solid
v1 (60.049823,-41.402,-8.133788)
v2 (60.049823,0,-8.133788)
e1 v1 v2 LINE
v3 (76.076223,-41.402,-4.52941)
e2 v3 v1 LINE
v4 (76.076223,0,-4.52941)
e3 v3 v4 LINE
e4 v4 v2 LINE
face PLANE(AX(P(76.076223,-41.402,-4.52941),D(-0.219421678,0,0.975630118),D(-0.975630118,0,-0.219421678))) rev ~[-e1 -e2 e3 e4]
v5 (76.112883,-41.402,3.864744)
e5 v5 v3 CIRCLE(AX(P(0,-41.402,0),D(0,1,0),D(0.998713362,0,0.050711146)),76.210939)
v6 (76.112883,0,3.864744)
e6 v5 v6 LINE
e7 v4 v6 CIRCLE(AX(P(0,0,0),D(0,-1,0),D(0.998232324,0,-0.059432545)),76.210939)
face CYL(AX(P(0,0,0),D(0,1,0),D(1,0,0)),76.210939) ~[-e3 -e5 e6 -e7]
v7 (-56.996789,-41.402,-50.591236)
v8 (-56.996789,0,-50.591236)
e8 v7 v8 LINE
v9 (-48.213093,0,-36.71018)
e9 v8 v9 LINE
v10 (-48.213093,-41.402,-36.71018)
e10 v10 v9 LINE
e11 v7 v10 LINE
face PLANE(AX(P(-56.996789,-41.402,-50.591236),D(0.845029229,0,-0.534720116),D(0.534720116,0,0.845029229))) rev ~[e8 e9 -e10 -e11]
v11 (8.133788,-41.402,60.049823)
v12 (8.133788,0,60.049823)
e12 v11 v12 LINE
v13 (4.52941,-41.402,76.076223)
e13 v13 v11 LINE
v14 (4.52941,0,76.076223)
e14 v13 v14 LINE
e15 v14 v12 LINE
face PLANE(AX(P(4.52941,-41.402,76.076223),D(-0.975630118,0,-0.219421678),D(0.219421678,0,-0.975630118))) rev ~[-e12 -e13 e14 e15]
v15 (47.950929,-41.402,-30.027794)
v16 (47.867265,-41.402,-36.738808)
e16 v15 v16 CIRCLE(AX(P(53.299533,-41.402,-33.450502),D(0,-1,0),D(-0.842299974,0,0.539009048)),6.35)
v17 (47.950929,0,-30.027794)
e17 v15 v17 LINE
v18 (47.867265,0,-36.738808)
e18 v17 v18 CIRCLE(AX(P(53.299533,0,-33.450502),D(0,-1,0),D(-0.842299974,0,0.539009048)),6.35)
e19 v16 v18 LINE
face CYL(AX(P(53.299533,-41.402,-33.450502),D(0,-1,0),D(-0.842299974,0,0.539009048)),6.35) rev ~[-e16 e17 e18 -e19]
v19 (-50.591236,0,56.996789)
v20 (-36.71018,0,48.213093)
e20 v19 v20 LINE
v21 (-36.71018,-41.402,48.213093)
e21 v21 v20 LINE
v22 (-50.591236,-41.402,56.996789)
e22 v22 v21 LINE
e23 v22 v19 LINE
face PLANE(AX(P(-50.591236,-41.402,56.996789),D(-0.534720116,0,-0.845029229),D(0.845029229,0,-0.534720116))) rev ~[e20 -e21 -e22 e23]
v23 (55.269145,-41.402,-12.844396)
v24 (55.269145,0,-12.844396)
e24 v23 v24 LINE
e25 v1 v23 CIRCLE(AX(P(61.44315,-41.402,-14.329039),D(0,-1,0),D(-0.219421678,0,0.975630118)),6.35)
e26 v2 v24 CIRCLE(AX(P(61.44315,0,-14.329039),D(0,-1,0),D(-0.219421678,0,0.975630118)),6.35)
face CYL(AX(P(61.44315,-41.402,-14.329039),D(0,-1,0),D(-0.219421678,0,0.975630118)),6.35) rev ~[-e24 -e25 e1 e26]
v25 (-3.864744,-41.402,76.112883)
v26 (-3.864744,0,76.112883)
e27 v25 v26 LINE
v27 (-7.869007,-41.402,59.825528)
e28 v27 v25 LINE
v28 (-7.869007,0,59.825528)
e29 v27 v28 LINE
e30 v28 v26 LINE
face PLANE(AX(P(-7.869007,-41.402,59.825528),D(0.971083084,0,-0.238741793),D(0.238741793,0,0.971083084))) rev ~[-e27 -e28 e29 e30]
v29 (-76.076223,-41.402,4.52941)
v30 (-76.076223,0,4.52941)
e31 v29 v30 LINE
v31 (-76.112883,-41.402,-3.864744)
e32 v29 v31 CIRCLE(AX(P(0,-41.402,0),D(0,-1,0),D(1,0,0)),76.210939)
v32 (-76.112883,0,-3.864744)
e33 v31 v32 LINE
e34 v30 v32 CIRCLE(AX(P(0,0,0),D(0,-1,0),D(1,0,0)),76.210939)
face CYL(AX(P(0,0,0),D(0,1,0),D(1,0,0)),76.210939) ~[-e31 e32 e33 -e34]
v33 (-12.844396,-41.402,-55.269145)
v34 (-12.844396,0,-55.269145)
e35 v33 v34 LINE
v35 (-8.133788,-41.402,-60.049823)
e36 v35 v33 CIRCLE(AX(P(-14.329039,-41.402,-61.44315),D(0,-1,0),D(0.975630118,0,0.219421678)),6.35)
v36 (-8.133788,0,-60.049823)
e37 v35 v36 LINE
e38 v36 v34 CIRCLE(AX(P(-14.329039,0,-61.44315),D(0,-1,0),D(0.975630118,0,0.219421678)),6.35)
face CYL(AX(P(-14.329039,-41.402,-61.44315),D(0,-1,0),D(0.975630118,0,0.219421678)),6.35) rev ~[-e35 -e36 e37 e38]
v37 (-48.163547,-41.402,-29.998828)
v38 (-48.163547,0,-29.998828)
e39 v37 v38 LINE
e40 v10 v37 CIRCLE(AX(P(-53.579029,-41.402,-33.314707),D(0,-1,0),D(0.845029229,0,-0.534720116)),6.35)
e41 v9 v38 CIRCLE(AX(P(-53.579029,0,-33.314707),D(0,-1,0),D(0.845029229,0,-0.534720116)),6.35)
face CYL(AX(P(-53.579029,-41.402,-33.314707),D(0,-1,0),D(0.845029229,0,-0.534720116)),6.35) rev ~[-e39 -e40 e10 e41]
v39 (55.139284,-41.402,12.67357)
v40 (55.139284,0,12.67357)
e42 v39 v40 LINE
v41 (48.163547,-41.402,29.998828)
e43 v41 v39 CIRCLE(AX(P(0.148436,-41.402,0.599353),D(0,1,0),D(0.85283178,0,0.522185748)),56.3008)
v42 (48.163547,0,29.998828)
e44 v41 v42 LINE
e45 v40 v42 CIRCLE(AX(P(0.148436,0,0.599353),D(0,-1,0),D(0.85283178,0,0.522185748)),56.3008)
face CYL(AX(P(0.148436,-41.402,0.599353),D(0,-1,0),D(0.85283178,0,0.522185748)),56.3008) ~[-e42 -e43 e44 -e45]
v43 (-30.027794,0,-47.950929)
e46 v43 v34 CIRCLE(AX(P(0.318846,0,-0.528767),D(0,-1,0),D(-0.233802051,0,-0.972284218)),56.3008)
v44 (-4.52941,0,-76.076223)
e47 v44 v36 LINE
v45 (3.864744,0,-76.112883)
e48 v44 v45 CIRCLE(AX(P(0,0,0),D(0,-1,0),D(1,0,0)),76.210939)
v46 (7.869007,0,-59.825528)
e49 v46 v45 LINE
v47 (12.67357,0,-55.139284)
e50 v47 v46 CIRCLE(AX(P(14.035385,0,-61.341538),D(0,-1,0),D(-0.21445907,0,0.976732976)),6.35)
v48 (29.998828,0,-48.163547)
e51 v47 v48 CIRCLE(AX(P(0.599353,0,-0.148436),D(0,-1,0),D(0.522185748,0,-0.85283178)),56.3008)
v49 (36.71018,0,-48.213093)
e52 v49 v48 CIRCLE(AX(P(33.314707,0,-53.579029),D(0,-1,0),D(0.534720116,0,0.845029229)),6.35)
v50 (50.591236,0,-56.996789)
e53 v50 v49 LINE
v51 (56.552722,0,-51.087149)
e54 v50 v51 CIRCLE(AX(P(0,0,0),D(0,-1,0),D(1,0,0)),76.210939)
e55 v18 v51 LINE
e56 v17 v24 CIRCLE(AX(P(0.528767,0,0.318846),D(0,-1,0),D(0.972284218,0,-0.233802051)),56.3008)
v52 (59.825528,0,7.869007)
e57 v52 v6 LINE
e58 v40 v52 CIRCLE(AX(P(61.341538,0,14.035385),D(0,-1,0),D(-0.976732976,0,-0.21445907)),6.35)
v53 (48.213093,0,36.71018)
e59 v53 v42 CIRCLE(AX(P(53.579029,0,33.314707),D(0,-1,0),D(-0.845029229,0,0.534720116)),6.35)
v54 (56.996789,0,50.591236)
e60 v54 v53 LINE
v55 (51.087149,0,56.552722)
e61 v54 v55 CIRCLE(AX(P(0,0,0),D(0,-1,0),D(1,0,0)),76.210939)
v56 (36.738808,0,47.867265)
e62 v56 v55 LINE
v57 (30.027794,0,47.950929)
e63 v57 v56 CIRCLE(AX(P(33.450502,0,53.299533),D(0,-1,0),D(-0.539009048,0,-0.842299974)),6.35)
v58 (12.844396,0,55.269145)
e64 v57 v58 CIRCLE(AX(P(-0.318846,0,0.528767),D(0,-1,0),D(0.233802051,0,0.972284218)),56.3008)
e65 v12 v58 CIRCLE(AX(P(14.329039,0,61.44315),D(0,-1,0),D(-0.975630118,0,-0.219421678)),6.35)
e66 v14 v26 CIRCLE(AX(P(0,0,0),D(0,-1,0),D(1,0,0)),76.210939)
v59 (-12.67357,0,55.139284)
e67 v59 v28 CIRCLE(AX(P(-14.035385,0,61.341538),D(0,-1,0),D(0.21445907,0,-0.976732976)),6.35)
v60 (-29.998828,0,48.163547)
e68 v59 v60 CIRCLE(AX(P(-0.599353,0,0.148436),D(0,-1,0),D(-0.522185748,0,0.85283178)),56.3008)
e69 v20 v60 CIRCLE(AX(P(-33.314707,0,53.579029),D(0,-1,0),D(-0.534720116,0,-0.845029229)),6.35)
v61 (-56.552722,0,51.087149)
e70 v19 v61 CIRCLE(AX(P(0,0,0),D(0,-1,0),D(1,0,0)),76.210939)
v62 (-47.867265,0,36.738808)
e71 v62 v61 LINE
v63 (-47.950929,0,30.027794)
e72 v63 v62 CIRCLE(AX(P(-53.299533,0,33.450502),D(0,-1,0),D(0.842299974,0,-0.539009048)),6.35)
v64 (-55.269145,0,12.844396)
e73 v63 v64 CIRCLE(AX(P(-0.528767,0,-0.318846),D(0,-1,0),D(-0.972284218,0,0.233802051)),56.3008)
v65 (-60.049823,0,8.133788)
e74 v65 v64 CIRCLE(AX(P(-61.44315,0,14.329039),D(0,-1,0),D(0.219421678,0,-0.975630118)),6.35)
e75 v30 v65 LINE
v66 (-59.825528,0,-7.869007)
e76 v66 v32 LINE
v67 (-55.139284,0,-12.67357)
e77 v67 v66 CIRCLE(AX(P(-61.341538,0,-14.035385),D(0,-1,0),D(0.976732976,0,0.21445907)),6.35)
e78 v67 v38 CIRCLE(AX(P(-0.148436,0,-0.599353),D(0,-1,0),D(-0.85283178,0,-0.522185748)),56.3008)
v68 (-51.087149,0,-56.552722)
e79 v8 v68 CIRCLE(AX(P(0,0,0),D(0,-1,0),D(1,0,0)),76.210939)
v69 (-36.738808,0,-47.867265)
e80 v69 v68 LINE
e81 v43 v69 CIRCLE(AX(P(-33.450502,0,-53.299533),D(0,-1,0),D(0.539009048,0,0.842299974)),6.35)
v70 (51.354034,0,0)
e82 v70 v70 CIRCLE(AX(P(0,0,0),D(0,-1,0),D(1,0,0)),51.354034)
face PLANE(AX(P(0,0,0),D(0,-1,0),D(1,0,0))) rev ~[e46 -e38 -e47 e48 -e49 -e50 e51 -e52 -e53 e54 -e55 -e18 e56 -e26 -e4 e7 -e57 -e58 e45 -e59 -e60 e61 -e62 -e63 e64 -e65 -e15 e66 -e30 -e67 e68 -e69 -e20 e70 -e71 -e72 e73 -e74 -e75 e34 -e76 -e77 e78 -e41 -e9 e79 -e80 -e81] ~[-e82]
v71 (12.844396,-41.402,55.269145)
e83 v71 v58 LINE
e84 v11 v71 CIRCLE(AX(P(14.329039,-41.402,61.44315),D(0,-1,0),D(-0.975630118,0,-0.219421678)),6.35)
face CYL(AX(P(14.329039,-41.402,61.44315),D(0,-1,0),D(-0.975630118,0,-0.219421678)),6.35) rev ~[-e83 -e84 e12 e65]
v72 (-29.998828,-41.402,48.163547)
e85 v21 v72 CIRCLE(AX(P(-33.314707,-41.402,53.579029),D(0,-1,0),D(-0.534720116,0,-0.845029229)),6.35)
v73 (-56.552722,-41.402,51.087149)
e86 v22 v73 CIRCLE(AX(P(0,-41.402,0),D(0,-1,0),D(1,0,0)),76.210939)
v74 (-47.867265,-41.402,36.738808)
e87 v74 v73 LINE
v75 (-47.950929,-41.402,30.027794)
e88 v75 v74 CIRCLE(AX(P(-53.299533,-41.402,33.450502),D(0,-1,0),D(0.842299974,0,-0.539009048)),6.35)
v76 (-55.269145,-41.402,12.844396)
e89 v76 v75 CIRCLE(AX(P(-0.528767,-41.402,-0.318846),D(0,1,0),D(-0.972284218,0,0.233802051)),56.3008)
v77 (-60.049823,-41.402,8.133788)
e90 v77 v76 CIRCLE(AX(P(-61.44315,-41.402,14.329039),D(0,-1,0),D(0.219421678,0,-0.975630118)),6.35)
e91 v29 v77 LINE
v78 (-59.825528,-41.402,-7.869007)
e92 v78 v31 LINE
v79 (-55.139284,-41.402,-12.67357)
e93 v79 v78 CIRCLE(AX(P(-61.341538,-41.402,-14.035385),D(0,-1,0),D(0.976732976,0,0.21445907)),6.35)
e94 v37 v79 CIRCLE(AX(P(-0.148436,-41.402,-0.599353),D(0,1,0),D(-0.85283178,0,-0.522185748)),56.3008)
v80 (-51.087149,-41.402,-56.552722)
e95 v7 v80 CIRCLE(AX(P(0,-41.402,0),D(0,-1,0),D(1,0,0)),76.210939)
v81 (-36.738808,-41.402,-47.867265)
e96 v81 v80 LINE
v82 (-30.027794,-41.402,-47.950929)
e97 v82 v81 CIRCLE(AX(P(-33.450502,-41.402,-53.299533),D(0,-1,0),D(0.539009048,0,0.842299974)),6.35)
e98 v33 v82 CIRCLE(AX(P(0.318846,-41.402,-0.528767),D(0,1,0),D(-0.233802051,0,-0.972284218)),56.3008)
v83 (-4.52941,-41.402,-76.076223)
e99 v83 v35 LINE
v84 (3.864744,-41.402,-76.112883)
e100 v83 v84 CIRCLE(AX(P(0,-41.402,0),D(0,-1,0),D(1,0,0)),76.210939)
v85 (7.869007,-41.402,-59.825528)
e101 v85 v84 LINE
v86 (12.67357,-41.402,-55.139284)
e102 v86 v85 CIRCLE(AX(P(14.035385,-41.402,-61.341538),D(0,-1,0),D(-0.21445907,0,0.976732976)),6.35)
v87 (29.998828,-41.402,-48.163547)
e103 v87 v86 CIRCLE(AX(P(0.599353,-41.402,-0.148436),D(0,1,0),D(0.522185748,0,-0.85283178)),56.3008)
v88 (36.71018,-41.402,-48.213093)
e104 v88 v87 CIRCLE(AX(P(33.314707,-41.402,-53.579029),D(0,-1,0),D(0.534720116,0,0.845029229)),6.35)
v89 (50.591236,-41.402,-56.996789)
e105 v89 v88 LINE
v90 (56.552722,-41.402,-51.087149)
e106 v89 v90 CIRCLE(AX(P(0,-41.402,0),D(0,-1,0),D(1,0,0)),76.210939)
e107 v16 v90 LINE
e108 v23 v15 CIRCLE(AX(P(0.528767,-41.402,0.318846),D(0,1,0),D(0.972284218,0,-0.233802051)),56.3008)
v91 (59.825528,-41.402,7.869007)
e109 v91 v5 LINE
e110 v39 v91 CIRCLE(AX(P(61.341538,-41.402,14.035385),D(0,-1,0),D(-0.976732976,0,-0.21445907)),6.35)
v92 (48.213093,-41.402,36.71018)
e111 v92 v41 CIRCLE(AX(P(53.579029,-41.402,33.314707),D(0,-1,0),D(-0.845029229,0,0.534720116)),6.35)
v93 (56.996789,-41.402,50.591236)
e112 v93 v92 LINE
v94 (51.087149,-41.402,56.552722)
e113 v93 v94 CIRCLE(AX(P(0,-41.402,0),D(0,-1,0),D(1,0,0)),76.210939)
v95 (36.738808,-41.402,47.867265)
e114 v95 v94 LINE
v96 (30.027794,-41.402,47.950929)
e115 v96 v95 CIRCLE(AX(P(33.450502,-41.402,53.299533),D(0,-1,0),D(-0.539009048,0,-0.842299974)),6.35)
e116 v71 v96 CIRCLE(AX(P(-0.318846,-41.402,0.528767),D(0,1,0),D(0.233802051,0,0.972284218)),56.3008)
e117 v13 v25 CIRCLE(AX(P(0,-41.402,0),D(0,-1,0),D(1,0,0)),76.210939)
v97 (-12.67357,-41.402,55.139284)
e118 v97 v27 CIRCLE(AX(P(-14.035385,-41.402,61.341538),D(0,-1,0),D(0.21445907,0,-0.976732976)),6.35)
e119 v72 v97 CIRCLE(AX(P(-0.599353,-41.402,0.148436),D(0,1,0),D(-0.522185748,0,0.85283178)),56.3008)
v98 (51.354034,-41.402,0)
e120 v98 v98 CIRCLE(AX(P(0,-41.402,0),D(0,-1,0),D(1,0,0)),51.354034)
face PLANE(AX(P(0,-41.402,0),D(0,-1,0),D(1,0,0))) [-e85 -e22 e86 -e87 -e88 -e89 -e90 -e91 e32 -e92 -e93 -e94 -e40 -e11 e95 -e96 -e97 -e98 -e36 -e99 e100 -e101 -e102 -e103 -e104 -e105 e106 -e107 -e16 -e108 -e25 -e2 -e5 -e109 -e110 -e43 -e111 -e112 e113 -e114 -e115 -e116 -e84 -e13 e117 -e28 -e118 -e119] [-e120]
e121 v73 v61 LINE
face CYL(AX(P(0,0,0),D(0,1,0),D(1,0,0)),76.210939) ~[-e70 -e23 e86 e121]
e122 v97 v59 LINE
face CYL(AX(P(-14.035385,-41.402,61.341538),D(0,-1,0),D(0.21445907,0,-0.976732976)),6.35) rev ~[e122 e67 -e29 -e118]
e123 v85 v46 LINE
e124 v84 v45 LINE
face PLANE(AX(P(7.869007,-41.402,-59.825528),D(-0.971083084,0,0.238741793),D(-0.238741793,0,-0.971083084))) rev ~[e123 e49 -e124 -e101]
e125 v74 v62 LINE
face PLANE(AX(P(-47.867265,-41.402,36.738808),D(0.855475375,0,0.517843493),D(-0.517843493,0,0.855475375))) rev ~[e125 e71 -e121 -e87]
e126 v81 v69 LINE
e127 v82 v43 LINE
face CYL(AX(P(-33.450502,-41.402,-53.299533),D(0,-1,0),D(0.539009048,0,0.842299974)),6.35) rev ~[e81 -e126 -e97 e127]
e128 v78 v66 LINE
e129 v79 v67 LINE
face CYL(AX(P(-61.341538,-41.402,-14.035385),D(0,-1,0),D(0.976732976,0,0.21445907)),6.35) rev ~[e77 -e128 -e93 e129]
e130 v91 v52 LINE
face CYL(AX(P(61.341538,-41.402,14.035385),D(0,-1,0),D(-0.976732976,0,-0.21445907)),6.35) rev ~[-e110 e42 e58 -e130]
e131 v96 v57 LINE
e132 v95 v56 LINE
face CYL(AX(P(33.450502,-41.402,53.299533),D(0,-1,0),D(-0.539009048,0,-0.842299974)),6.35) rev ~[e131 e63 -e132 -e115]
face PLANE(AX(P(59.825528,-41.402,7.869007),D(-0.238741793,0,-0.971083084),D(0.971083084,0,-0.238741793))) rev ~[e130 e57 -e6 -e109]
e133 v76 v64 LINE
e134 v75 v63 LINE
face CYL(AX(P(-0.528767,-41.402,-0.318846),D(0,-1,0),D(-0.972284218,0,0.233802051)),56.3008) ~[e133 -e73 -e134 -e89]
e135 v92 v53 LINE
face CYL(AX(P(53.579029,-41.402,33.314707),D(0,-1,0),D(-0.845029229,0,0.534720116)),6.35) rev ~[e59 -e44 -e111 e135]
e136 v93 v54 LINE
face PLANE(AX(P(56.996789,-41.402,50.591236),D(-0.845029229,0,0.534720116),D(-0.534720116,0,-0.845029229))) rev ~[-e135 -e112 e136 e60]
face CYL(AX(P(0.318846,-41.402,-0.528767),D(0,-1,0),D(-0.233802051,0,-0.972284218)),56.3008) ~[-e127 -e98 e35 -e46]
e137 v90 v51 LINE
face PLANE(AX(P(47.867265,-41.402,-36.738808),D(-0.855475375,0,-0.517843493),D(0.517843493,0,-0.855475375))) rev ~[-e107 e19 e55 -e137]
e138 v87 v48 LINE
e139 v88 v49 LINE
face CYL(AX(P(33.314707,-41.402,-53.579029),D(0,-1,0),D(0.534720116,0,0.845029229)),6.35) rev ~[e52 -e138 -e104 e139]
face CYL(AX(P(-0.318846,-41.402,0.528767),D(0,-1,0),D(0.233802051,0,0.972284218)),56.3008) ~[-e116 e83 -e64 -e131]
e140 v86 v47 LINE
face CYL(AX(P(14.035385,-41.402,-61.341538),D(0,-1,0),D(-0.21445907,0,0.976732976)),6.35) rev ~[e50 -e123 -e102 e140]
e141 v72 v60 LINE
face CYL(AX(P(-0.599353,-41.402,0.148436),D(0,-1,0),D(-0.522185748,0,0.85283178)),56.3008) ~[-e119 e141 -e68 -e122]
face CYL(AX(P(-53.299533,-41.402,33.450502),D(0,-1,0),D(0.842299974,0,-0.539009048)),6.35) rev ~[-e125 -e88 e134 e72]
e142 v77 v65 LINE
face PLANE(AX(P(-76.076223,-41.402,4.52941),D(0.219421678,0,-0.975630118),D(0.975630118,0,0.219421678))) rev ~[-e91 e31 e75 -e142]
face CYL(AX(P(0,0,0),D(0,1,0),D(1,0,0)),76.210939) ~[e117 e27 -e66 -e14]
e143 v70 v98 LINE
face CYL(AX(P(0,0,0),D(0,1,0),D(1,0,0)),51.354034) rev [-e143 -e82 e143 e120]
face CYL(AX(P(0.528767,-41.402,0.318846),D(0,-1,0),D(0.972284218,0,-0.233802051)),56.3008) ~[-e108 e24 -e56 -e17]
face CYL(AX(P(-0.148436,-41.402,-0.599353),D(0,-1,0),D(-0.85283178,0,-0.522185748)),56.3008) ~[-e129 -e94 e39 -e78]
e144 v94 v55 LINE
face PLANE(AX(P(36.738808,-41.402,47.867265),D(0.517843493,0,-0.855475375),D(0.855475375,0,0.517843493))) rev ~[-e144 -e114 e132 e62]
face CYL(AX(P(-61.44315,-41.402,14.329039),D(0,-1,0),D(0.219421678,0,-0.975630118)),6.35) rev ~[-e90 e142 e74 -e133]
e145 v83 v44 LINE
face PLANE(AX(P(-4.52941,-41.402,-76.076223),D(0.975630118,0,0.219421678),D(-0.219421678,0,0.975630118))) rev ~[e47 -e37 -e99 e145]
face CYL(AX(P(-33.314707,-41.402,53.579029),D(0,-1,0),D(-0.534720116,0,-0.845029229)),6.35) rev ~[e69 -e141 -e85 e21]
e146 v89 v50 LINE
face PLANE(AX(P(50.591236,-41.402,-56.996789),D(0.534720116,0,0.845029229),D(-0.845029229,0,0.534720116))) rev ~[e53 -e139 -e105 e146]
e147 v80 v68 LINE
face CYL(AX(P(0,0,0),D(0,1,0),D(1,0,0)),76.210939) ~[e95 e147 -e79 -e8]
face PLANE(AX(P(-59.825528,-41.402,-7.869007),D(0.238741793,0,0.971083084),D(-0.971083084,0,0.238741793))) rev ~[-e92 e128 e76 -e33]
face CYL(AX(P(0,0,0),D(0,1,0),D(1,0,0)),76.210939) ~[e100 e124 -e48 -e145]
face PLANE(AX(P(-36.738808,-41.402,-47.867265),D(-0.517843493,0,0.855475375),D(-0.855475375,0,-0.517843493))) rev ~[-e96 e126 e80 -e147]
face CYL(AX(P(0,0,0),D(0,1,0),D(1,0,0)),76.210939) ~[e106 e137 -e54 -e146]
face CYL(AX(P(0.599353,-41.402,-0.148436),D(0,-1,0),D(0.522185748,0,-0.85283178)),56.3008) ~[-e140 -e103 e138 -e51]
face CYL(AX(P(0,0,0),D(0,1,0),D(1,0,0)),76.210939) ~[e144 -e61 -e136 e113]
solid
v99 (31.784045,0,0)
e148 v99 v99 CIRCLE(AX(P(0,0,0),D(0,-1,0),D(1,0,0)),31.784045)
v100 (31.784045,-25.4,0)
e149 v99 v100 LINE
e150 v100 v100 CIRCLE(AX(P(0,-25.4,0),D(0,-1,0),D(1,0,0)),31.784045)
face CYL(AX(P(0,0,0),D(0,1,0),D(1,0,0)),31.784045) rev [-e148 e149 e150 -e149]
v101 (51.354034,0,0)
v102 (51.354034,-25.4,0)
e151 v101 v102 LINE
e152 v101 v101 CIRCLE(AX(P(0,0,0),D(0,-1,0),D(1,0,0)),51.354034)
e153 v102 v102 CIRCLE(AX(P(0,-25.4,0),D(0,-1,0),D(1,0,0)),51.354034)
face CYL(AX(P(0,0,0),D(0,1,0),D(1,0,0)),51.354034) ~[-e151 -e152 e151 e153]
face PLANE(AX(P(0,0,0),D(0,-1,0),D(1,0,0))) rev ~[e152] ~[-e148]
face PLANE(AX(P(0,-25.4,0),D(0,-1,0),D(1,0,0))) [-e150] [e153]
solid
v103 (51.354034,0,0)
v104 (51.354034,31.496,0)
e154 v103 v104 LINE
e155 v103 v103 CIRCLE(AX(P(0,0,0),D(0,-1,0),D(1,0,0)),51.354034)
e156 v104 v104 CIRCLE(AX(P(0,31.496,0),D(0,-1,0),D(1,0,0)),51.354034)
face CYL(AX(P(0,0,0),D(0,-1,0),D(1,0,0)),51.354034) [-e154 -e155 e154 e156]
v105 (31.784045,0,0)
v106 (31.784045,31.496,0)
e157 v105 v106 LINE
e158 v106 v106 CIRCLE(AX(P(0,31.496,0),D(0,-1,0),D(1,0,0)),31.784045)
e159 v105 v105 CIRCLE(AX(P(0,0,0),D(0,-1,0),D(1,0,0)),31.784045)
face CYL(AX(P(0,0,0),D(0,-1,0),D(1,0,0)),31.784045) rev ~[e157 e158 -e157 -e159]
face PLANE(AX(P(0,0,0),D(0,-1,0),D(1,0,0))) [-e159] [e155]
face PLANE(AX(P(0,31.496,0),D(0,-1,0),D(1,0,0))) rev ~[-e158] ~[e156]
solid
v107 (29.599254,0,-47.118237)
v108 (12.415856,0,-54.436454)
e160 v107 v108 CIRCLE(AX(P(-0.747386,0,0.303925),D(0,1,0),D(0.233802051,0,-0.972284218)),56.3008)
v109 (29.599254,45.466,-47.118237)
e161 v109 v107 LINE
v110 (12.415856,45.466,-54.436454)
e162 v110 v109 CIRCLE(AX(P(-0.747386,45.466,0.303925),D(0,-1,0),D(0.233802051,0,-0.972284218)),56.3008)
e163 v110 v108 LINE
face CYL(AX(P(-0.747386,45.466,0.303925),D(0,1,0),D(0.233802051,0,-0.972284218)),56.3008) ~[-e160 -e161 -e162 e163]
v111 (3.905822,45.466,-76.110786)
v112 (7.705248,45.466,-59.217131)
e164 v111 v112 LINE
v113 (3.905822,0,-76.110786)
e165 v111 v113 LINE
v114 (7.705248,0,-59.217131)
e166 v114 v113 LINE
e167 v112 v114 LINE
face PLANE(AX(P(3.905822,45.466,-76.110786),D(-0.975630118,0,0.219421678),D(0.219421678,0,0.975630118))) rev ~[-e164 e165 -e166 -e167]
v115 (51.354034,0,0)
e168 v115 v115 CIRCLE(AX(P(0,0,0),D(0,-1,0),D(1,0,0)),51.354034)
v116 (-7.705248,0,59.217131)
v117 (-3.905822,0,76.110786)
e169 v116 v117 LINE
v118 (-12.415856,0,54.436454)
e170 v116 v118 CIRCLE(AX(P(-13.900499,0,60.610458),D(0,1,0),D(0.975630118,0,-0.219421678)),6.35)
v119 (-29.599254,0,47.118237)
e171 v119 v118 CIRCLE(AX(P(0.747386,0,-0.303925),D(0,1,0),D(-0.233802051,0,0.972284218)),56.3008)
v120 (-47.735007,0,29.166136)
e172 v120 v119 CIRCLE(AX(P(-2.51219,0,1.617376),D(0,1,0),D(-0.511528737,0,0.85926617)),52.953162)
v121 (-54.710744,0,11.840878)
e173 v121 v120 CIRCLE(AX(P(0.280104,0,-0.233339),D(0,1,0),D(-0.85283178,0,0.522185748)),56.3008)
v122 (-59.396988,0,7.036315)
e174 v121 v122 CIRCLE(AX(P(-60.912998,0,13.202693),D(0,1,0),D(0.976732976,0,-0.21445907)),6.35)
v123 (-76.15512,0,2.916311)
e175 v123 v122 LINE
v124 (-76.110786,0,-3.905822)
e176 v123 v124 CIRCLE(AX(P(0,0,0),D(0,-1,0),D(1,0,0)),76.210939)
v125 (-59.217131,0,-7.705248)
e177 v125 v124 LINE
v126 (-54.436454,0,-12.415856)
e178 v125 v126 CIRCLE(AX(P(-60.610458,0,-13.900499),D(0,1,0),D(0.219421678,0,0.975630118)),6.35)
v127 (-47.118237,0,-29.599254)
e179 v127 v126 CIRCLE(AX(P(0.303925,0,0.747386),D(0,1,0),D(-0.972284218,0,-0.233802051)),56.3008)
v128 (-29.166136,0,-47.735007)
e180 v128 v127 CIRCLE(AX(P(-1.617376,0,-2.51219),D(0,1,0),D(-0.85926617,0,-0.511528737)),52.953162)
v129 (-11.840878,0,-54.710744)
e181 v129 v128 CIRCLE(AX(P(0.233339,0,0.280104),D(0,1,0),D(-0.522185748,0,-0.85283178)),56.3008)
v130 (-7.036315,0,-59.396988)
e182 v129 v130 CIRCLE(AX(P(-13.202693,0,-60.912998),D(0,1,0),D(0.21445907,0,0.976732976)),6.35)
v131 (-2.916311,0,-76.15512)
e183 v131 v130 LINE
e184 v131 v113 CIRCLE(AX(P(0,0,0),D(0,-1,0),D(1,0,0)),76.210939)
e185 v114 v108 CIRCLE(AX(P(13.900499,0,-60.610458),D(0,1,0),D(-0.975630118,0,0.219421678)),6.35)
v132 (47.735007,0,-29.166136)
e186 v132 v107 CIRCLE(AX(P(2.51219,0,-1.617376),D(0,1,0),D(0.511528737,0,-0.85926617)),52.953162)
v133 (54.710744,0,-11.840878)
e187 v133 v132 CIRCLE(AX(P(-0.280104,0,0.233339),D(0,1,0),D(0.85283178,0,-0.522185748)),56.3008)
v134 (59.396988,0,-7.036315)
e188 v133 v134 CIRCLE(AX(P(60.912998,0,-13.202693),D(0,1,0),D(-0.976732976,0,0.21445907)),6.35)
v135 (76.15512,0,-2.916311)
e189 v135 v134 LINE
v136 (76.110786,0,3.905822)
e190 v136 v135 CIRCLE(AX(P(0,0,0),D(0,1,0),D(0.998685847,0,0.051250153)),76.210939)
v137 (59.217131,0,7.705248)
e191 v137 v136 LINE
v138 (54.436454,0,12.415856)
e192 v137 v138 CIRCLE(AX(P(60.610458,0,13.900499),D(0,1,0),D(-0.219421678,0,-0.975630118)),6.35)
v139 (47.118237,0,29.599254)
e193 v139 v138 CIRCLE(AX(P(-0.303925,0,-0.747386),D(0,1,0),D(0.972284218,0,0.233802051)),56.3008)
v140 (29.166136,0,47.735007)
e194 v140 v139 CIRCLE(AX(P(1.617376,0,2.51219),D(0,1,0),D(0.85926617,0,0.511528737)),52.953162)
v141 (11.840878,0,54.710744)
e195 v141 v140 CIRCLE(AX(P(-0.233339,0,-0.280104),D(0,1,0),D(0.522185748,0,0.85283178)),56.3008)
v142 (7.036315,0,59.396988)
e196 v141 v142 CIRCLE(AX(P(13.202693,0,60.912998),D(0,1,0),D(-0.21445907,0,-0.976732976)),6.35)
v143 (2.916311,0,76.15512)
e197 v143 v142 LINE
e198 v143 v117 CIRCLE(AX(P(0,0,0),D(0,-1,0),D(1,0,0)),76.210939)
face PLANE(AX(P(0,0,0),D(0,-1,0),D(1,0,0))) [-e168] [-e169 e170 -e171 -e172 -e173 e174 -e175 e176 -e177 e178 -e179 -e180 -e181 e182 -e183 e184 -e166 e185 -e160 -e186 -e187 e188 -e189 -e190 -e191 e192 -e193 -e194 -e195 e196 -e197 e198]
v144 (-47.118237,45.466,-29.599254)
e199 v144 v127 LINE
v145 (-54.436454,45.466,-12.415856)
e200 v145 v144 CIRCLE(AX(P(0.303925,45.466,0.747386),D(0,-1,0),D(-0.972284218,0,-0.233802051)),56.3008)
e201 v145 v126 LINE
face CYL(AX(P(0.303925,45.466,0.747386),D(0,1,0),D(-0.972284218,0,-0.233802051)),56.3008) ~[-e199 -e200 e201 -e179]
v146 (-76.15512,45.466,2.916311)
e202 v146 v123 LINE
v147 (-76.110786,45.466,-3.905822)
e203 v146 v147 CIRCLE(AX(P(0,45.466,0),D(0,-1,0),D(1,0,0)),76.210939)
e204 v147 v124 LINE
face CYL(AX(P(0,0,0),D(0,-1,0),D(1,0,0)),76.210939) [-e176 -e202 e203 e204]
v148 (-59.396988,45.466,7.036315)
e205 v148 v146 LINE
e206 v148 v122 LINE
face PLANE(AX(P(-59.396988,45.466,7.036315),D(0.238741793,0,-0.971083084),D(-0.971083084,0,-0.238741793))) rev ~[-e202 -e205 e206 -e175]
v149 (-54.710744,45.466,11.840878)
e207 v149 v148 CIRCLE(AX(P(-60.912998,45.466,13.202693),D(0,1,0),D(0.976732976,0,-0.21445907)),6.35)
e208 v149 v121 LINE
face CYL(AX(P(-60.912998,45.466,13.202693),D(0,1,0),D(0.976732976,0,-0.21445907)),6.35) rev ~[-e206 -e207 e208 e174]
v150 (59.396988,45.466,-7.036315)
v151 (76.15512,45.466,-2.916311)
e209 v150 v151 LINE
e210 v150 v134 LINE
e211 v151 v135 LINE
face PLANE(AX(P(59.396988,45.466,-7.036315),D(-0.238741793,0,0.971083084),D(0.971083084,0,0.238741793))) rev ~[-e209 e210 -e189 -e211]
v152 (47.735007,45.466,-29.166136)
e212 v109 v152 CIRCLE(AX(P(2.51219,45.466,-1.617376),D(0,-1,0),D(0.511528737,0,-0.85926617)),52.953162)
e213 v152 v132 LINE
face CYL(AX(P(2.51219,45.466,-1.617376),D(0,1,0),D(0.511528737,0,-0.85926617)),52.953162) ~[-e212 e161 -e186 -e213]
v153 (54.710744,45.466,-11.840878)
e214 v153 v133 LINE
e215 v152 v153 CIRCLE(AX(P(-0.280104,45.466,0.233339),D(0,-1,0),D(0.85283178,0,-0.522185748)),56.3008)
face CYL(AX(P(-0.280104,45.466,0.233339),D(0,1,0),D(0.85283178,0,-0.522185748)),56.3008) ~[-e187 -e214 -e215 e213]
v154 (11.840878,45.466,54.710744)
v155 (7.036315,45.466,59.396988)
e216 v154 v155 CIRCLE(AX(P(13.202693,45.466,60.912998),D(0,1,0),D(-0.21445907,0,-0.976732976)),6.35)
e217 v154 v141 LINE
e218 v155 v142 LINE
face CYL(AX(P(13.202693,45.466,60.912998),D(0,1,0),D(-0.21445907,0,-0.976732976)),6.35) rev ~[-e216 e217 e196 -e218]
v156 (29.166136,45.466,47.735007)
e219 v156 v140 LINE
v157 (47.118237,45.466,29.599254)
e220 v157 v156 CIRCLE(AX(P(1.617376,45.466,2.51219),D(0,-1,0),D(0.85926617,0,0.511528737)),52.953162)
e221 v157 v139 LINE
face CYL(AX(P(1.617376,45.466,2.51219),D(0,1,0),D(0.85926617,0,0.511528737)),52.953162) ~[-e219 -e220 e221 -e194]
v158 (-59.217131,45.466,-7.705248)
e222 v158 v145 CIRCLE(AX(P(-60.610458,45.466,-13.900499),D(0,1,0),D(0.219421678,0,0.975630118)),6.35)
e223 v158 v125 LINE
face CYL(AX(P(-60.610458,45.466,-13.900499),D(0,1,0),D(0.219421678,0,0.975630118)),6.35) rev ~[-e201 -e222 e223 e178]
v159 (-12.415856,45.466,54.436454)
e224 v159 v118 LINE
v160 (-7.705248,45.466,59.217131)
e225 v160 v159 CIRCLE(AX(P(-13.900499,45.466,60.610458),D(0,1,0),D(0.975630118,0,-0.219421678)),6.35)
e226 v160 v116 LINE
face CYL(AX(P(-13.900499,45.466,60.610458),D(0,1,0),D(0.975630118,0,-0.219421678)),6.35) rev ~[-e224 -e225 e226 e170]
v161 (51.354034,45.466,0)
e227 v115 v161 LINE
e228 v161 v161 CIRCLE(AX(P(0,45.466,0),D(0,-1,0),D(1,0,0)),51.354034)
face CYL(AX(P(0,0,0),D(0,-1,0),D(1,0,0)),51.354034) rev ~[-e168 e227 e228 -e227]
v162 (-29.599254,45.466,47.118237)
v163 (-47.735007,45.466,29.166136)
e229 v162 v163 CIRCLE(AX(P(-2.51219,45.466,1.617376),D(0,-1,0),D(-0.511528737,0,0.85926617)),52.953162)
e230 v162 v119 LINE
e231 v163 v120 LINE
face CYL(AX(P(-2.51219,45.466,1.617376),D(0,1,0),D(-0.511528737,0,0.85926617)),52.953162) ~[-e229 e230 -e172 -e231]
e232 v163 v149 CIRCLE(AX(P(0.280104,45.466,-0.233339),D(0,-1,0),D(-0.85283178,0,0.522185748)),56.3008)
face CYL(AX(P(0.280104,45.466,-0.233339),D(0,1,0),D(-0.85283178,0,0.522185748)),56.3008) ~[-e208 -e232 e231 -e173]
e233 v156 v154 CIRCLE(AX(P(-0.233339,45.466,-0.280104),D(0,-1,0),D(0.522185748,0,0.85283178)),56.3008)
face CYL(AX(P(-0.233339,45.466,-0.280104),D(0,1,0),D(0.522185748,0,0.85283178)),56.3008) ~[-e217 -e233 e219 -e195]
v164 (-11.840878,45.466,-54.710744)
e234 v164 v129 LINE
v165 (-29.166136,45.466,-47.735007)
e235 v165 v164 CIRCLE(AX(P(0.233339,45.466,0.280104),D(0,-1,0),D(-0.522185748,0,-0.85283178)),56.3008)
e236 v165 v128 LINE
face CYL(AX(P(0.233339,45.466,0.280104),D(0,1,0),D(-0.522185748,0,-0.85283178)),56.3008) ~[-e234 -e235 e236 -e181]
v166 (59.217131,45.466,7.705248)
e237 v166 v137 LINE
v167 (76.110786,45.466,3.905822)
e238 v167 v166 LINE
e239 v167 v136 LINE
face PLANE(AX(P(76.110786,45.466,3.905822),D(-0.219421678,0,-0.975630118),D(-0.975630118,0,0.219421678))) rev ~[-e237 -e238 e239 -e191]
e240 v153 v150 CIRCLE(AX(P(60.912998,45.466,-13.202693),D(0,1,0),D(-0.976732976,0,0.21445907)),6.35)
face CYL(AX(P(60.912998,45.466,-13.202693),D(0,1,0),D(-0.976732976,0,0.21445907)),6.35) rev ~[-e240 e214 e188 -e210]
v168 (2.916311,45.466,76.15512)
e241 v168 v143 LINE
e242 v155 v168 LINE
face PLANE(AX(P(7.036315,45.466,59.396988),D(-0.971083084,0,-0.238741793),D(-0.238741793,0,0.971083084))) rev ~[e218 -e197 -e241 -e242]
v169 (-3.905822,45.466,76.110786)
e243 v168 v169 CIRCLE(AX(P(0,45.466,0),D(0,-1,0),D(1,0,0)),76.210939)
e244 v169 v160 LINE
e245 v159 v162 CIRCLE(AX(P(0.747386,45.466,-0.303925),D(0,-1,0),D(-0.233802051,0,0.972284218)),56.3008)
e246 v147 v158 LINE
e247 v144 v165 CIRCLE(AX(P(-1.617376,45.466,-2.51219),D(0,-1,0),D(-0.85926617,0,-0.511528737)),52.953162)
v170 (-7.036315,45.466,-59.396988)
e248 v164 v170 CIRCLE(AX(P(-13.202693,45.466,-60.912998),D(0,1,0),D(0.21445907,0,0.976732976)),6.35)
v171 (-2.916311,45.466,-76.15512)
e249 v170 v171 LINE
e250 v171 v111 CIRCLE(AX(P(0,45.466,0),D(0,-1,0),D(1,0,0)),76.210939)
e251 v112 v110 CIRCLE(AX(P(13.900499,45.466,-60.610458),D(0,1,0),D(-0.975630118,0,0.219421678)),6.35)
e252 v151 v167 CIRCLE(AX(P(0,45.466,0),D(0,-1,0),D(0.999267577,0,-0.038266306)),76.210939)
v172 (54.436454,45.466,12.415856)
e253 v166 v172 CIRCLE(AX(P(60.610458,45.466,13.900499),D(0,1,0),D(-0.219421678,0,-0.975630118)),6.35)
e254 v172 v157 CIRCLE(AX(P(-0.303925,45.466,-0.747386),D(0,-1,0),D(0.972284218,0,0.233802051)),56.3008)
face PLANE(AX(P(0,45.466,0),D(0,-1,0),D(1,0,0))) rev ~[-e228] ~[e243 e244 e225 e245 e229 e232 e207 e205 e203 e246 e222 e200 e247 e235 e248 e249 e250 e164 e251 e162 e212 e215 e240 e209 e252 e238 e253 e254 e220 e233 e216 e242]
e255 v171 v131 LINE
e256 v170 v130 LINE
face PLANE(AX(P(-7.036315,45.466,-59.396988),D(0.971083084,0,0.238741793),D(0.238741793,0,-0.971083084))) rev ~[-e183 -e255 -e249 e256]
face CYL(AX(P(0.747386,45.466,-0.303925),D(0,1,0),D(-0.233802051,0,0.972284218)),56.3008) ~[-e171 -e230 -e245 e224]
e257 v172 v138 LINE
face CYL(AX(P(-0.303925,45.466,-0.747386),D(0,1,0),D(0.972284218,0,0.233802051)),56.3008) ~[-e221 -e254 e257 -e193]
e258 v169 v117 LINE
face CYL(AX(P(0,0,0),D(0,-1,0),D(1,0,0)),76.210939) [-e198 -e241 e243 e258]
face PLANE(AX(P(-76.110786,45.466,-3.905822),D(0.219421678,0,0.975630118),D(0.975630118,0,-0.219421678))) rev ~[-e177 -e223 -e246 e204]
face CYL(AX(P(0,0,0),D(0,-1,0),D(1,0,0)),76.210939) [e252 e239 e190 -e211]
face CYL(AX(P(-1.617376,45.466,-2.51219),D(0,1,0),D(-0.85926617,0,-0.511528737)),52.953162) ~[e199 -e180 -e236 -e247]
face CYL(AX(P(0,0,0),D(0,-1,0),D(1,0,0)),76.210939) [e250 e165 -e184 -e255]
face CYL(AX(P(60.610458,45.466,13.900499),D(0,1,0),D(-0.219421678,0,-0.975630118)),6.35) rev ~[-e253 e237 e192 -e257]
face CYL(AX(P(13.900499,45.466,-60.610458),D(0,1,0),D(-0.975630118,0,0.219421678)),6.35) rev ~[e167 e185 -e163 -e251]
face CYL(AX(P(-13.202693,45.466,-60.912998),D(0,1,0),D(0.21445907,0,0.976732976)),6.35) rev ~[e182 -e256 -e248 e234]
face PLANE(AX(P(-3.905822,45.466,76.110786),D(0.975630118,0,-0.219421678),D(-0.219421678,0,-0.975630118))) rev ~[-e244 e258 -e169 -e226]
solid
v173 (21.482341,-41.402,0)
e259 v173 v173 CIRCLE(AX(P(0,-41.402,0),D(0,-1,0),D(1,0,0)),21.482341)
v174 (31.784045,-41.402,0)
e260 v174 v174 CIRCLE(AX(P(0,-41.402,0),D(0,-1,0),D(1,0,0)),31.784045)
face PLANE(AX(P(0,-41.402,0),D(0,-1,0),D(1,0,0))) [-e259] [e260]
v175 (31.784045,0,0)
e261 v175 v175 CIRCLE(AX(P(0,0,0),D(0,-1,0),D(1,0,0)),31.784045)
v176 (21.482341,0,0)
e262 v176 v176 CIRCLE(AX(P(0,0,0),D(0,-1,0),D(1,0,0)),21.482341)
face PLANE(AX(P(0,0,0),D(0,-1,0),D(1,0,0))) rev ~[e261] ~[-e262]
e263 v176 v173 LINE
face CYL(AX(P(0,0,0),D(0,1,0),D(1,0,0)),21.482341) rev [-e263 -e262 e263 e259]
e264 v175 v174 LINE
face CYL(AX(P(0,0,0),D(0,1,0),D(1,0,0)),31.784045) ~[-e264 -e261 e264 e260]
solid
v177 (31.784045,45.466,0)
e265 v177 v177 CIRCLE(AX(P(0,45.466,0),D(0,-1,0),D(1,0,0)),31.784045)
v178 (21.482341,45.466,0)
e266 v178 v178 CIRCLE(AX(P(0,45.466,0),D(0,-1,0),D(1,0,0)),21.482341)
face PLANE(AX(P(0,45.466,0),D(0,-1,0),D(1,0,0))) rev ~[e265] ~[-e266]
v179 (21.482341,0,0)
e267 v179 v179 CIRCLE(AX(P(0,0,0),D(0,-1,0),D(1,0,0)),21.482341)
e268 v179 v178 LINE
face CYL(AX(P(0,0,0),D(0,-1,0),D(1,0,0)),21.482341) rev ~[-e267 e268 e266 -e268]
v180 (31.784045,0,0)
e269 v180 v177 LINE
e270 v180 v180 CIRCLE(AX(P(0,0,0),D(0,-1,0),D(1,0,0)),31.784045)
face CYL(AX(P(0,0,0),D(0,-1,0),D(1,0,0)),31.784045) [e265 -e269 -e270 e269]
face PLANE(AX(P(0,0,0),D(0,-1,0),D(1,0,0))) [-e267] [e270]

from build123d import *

# Parameters (mm, degrees)
F0_R     = 76.2109388573
F0_R_2   = 51.3540335205
F1_DEPTH = 41.402
F0_R_3   = 31.7840451581
F0_R_4   = 21.4823406774
F2_DEPTH = 25.4
F4_DEPTH = 71.882
F5_DEPTH = 45.466
F6_DEPTH = 31.496
F8_DEPTH = 51.054


with BuildPart() as f1:
    # F0 (on Front) → F1 (new body)
    with BuildSketch(Plane.XZ):
        Circle(F0_R)
        Circle(F0_R_2, mode=Mode.SUBTRACT)
    extrude(amount=F1_DEPTH)

    # F3 (on face) → F4 (cut)
    with BuildSketch(Plane.XZ.offset(41.402)):
        with BuildLine():
            Line((-47.8672647572, 36.7388077798), (-56.5527223926, 51.0871489857))
            ThreePointArc((-56.5527223926, 51.0871489857), (-70.2816834344, 29.4718878788), (-76.0762226062, 4.529410059))
            Line((-76.0762226062, 4.529410059), (-60.0498225812, 8.1337879145))
            ThreePointArc((-60.0498225812, 8.1337879145), (-56.9862917555, 9.8058862302), (-55.2691454533, 12.8443961405))
            ThreePointArc((-55.2691454533, 12.8443961405), (-52.3275453278, 21.741673907), (-47.9509285541, 30.0277941433))
            ThreePointArc((-47.9509285541, 30.0277941433), (-46.9500267793, 33.3713445818), (-47.8672647572, 36.7388077798))
        make_face()
        with BuildLine():
            Line((-7.8690073929, 59.8255276205), (-3.8647440191, 76.1128829777))
            ThreePointArc((-3.8647440191, 76.1128829777), (-28.8568831762, 70.5364267231), (-50.5912363244, 56.9967894593))
            Line((-50.5912363244, 56.9967894593), (-36.7101801652, 48.2130933472))
            ThreePointArc((-36.7101801652, 48.2130933472), (-33.361584686, 47.2292019839), (-29.9988279292, 48.1635471516))
            ThreePointArc((-29.9988279292, 48.1635471516), (-21.6274770901, 52.3748471981), (-12.673569882, 55.1392836076))
            ThreePointArc((-12.673569882, 55.1392836076), (-9.6015782614, 56.7957863637), (-7.8690073929, 59.8255276205))
        make_face()
        with BuildLine():
            ThreePointArc((51.0871489857, 56.5527223926), (29.4718878788, 70.2816834344), (4.529410059, 76.0762226062))
            Line((4.529410059, 76.0762226062), (8.1337879145, 60.0498225812))
            ThreePointArc((8.1337879145, 60.0498225812), (9.8058862302, 56.9862917555), (12.8443961405, 55.2691454533))
            ThreePointArc((12.8443961405, 55.2691454533), (21.741673907, 52.3275453278), (30.0277941433, 47.9509285541))
            ThreePointArc((30.0277941433, 47.9509285541), (33.3713445818, 46.9500267793), (36.7388077798, 47.8672647572))
            Line((36.7388077798, 47.8672647572), (51.0871489857, 56.5527223926))
        make_face()
        with BuildLine():
            ThreePointArc((76.1128829777, 3.8647440191), (70.5364267231, 28.8568831762), (56.9967894593, 50.5912363244))
            Line((56.9967894593, 50.5912363244), (48.2130933472, 36.7101801652))
            ThreePointArc((48.2130933472, 36.7101801652), (47.2292019839, 33.361584686), (48.1635471516, 29.9988279292))
            ThreePointArc((48.1635471516, 29.9988279292), (52.3748471981, 21.6274770901), (55.1392836076, 12.673569882))
            ThreePointArc((55.1392836076, 12.673569882), (56.7957863637, 9.6015782614), (59.8255276205, 7.8690073929))
            Line((59.8255276205, 7.8690073929), (76.1128829777, 3.8647440191))
        make_face()
        with BuildLine():
            ThreePointArc((56.5527223926, -51.0871489857), (70.2816834344, -29.4718878788), (76.0762226062, -4.529410059))
            Line((76.0762226062, -4.529410059), (60.0498225812, -8.1337879145))
            ThreePointArc((60.0498225812, -8.1337879145), (56.9862917555, -9.8058862302), (55.2691454533, -12.8443961405))
            ThreePointArc((55.2691454533, -12.8443961405), (52.3275453278, -21.741673907), (47.9509285541, -30.0277941433))
            ThreePointArc((47.9509285541, -30.0277941433), (46.9500267793, -33.3713445818), (47.8672647572, -36.7388077798))
            Line((47.8672647572, -36.7388077798), (56.5527223926, -51.0871489857))
        make_face()
        with BuildLine():
            ThreePointArc((3.8647440191, -76.1128829777), (28.8568831762, -70.5364267231), (50.5912363244, -56.9967894593))
            Line((50.5912363244, -56.9967894593), (36.7101801652, -48.2130933472))
            ThreePointArc((36.7101801652, -48.2130933472), (33.361584686, -47.2292019839), (29.9988279292, -48.1635471516))
            ThreePointArc((29.9988279292, -48.1635471516), (21.6274770901, -52.3748471981), (12.673569882, -55.1392836076))
            ThreePointArc((12.673569882, -55.1392836076), (9.6015782614, -56.7957863637), (7.8690073929, -59.8255276205))
            Line((7.8690073929, -59.8255276205), (3.8647440191, -76.1128829777))
        make_face()
        with BuildLine():
            Line((-36.7388077798, -47.8672647572), (-51.0871489857, -56.5527223926))
            ThreePointArc((-51.0871489857, -56.5527223926), (-29.4718878788, -70.2816834344), (-4.529410059, -76.0762226062))
            Line((-4.529410059, -76.0762226062), (-8.1337879145, -60.0498225812))
            ThreePointArc((-8.1337879145, -60.0498225812), (-9.8058862302, -56.9862917555), (-12.8443961405, -55.2691454533))
            ThreePointArc((-12.8443961405, -55.2691454533), (-21.741673907, -52.3275453278), (-30.0277941433, -47.9509285541))
            ThreePointArc((-30.0277941433, -47.9509285541), (-33.3713445818, -46.9500267793), (-36.7388077798, -47.8672647572))
        make_face()
        with BuildLine():
            Line((-59.8255276205, -7.8690073929), (-76.1128829777, -3.8647440191))
            ThreePointArc((-76.1128829777, -3.8647440191), (-70.5364267231, -28.8568831762), (-56.9967894593, -50.5912363244))
            Line((-56.9967894593, -50.5912363244), (-48.2130933472, -36.7101801652))
            ThreePointArc((-48.2130933472, -36.7101801652), (-47.2292019839, -33.361584686), (-48.1635471516, -29.9988279292))
            ThreePointArc((-48.1635471516, -29.9988279292), (-52.3748471981, -21.6274770901), (-55.1392836076, -12.673569882))
            ThreePointArc((-55.1392836076, -12.673569882), (-56.7957863637, -9.6015782614), (-59.8255276205, -7.8690073929))
        make_face()
    extrude(amount=-F4_DEPTH, mode=Mode.SUBTRACT)


with BuildPart() as f1b:
    # F0 (on Front) → F1, piece 2 (new body)
    with BuildSketch(Plane.XZ):
        Circle(F0_R_3)
        Circle(F0_R_4, mode=Mode.SUBTRACT)
    extrude(amount=F1_DEPTH)


with BuildPart() as f2:
    # F0 (on Front) → F2 (new body)
    with BuildSketch(Plane.XZ):
        Circle(F0_R_2)
        Circle(F0_R_3, mode=Mode.SUBTRACT)
    extrude(amount=F2_DEPTH)


with BuildPart() as f5:
    # F0 (on Front) → F5 (new body)
    with BuildSketch(Plane.XZ):
        Circle(F0_R_3)
        Circle(F0_R_4, mode=Mode.SUBTRACT)
    extrude(amount=-F5_DEPTH)


with BuildPart() as f5b:
    # F0 (on Front) → F5, piece 2 (new body)
    with BuildSketch(Plane.XZ):
        Circle(F0_R)
        Circle(F0_R_2, mode=Mode.SUBTRACT)
    extrude(amount=-F5_DEPTH)

    # F7 (on face) → F8 (cut)
    with BuildSketch(Plane(origin=(0, 45.466, 0), x_dir=(-1, 0, 0), z_dir=(0, 1, 0))):
        with BuildLine():
            ThreePointArc((-47.1182366423, 29.5992543095), (-39.2509800473, 39.7646962899), (-29.1661360175, 47.7350073178))
            ThreePointArc((-29.1661360175, 47.7350073178), (-20.7947851783, 51.9463073643), (-11.8408779702, 54.7107437738))
            ThreePointArc((-11.8408779702, 54.7107437738), (-8.7688863497, 56.3672465299), (-7.0363154811, 59.3969877867))
            Line((-7.0363154811, 59.3969877867), (-2.9163110774, 76.1551201903))
            ThreePointArc((-2.9163110774, 76.1551201903), (-53.5379377777, 54.2383298048), (-76.1107860532, 3.9058223039))
            Line((-76.1107860532, 3.9058223039), (-59.2171306694, 7.7052480807))
            ThreePointArc((-59.2171306694, 7.7052480807), (-56.1535998437, 9.3773463964), (-54.4364535416, 12.4158563067))
            ThreePointArc((-54.4364535416, 12.4158563067), (-51.494853416, 21.3131340732), (-47.1182366423, 29.5992543095))
        make_face()
        with BuildLine():
            ThreePointArc((76.1551201903, 2.9163110774), (54.2383298048, 53.5379377777), (3.9058223039, 76.1107860532))
            Line((3.9058223039, 76.1107860532), (7.7052480807, 59.2171306694))
            ThreePointArc((7.7052480807, 59.2171306694), (9.3773463964, 56.1535998437), (12.4158563067, 54.4364535416))
            ThreePointArc((12.4158563067, 54.4364535416), (21.3131340732, 51.494853416), (29.5992543095, 47.1182366423))
            ThreePointArc((29.5992543095, 47.1182366423), (39.7646962899, 39.2509800473), (47.7350073178, 29.1661360175))
            ThreePointArc((47.7350073178, 29.1661360175), (51.9463073643, 20.7947851783), (54.7107437738, 11.8408779702))
            ThreePointArc((54.7107437738, 11.8408779702), (56.3672465299, 8.7688863497), (59.3969877867, 7.0363154811))
            Line((59.3969877867, 7.0363154811), (76.1551201903, 2.9163110774))
        make_face()
        with BuildLine():
            ThreePointArc((2.9163110774, -76.1551201903), (53.5379377777, -54.2383298048), (76.1107860532, -3.9058223039))
            Line((76.1107860532, -3.9058223039), (59.2171306694, -7.7052480807))
            ThreePointArc((59.2171306694, -7.7052480807), (56.1535998437, -9.3773463964), (54.4364535416, -12.4158563067))
            ThreePointArc((54.4364535416, -12.4158563067), (51.494853416, -21.3131340732), (47.1182366423, -29.5992543095))
            ThreePointArc((47.1182366423, -29.5992543095), (39.2509800473, -39.7646962899), (29.1661360175, -47.7350073178))
            ThreePointArc((29.1661360175, -47.7350073178), (20.7947851783, -51.9463073643), (11.8408779702, -54.7107437738))
            ThreePointArc((11.8408779702, -54.7107437738), (8.7688863497, -56.3672465299), (7.0363154811, -59.3969877867))
            Line((7.0363154811, -59.3969877867), (2.9163110774, -76.1551201903))
        make_face()
        with BuildLine():
            Line((-59.3969877867, -7.0363154811), (-76.1551201903, -2.9163110774))
            ThreePointArc((-76.1551201903, -2.9163110774), (-54.2383298048, -53.5379377777), (-3.9058223039, -76.1107860532))
            Line((-3.9058223039, -76.1107860532), (-7.7052480807, -59.2171306694))
            ThreePointArc((-7.7052480807, -59.2171306694), (-9.3773463964, -56.1535998437), (-12.4158563067, -54.4364535416))
            ThreePointArc((-12.4158563067, -54.4364535416), (-21.3131340732, -51.494853416), (-29.5992543095, -47.1182366423))
            ThreePointArc((-29.5992543095, -47.1182366423), (-39.7646962899, -39.2509800473), (-47.7350073178, -29.1661360175))
            ThreePointArc((-47.7350073178, -29.1661360175), (-51.9463073643, -20.7947851783), (-54.7107437738, -11.8408779702))
            ThreePointArc((-54.7107437738, -11.8408779702), (-56.3672465299, -8.7688863497), (-59.3969877867, -7.0363154811))
        make_face()
    extrude(amount=-F8_DEPTH, mode=Mode.SUBTRACT)


with BuildPart() as f6:
    # F0 (on Front) → F6 (new body)
    with BuildSketch(Plane.XZ):
        Circle(F0_R_2)
        Circle(F0_R_3, mode=Mode.SUBTRACT)
    extrude(amount=-F6_DEPTH)


solid = Compound([f1.part, f1b.part, f2.part, f5.part, f5b.part, f6.part])
